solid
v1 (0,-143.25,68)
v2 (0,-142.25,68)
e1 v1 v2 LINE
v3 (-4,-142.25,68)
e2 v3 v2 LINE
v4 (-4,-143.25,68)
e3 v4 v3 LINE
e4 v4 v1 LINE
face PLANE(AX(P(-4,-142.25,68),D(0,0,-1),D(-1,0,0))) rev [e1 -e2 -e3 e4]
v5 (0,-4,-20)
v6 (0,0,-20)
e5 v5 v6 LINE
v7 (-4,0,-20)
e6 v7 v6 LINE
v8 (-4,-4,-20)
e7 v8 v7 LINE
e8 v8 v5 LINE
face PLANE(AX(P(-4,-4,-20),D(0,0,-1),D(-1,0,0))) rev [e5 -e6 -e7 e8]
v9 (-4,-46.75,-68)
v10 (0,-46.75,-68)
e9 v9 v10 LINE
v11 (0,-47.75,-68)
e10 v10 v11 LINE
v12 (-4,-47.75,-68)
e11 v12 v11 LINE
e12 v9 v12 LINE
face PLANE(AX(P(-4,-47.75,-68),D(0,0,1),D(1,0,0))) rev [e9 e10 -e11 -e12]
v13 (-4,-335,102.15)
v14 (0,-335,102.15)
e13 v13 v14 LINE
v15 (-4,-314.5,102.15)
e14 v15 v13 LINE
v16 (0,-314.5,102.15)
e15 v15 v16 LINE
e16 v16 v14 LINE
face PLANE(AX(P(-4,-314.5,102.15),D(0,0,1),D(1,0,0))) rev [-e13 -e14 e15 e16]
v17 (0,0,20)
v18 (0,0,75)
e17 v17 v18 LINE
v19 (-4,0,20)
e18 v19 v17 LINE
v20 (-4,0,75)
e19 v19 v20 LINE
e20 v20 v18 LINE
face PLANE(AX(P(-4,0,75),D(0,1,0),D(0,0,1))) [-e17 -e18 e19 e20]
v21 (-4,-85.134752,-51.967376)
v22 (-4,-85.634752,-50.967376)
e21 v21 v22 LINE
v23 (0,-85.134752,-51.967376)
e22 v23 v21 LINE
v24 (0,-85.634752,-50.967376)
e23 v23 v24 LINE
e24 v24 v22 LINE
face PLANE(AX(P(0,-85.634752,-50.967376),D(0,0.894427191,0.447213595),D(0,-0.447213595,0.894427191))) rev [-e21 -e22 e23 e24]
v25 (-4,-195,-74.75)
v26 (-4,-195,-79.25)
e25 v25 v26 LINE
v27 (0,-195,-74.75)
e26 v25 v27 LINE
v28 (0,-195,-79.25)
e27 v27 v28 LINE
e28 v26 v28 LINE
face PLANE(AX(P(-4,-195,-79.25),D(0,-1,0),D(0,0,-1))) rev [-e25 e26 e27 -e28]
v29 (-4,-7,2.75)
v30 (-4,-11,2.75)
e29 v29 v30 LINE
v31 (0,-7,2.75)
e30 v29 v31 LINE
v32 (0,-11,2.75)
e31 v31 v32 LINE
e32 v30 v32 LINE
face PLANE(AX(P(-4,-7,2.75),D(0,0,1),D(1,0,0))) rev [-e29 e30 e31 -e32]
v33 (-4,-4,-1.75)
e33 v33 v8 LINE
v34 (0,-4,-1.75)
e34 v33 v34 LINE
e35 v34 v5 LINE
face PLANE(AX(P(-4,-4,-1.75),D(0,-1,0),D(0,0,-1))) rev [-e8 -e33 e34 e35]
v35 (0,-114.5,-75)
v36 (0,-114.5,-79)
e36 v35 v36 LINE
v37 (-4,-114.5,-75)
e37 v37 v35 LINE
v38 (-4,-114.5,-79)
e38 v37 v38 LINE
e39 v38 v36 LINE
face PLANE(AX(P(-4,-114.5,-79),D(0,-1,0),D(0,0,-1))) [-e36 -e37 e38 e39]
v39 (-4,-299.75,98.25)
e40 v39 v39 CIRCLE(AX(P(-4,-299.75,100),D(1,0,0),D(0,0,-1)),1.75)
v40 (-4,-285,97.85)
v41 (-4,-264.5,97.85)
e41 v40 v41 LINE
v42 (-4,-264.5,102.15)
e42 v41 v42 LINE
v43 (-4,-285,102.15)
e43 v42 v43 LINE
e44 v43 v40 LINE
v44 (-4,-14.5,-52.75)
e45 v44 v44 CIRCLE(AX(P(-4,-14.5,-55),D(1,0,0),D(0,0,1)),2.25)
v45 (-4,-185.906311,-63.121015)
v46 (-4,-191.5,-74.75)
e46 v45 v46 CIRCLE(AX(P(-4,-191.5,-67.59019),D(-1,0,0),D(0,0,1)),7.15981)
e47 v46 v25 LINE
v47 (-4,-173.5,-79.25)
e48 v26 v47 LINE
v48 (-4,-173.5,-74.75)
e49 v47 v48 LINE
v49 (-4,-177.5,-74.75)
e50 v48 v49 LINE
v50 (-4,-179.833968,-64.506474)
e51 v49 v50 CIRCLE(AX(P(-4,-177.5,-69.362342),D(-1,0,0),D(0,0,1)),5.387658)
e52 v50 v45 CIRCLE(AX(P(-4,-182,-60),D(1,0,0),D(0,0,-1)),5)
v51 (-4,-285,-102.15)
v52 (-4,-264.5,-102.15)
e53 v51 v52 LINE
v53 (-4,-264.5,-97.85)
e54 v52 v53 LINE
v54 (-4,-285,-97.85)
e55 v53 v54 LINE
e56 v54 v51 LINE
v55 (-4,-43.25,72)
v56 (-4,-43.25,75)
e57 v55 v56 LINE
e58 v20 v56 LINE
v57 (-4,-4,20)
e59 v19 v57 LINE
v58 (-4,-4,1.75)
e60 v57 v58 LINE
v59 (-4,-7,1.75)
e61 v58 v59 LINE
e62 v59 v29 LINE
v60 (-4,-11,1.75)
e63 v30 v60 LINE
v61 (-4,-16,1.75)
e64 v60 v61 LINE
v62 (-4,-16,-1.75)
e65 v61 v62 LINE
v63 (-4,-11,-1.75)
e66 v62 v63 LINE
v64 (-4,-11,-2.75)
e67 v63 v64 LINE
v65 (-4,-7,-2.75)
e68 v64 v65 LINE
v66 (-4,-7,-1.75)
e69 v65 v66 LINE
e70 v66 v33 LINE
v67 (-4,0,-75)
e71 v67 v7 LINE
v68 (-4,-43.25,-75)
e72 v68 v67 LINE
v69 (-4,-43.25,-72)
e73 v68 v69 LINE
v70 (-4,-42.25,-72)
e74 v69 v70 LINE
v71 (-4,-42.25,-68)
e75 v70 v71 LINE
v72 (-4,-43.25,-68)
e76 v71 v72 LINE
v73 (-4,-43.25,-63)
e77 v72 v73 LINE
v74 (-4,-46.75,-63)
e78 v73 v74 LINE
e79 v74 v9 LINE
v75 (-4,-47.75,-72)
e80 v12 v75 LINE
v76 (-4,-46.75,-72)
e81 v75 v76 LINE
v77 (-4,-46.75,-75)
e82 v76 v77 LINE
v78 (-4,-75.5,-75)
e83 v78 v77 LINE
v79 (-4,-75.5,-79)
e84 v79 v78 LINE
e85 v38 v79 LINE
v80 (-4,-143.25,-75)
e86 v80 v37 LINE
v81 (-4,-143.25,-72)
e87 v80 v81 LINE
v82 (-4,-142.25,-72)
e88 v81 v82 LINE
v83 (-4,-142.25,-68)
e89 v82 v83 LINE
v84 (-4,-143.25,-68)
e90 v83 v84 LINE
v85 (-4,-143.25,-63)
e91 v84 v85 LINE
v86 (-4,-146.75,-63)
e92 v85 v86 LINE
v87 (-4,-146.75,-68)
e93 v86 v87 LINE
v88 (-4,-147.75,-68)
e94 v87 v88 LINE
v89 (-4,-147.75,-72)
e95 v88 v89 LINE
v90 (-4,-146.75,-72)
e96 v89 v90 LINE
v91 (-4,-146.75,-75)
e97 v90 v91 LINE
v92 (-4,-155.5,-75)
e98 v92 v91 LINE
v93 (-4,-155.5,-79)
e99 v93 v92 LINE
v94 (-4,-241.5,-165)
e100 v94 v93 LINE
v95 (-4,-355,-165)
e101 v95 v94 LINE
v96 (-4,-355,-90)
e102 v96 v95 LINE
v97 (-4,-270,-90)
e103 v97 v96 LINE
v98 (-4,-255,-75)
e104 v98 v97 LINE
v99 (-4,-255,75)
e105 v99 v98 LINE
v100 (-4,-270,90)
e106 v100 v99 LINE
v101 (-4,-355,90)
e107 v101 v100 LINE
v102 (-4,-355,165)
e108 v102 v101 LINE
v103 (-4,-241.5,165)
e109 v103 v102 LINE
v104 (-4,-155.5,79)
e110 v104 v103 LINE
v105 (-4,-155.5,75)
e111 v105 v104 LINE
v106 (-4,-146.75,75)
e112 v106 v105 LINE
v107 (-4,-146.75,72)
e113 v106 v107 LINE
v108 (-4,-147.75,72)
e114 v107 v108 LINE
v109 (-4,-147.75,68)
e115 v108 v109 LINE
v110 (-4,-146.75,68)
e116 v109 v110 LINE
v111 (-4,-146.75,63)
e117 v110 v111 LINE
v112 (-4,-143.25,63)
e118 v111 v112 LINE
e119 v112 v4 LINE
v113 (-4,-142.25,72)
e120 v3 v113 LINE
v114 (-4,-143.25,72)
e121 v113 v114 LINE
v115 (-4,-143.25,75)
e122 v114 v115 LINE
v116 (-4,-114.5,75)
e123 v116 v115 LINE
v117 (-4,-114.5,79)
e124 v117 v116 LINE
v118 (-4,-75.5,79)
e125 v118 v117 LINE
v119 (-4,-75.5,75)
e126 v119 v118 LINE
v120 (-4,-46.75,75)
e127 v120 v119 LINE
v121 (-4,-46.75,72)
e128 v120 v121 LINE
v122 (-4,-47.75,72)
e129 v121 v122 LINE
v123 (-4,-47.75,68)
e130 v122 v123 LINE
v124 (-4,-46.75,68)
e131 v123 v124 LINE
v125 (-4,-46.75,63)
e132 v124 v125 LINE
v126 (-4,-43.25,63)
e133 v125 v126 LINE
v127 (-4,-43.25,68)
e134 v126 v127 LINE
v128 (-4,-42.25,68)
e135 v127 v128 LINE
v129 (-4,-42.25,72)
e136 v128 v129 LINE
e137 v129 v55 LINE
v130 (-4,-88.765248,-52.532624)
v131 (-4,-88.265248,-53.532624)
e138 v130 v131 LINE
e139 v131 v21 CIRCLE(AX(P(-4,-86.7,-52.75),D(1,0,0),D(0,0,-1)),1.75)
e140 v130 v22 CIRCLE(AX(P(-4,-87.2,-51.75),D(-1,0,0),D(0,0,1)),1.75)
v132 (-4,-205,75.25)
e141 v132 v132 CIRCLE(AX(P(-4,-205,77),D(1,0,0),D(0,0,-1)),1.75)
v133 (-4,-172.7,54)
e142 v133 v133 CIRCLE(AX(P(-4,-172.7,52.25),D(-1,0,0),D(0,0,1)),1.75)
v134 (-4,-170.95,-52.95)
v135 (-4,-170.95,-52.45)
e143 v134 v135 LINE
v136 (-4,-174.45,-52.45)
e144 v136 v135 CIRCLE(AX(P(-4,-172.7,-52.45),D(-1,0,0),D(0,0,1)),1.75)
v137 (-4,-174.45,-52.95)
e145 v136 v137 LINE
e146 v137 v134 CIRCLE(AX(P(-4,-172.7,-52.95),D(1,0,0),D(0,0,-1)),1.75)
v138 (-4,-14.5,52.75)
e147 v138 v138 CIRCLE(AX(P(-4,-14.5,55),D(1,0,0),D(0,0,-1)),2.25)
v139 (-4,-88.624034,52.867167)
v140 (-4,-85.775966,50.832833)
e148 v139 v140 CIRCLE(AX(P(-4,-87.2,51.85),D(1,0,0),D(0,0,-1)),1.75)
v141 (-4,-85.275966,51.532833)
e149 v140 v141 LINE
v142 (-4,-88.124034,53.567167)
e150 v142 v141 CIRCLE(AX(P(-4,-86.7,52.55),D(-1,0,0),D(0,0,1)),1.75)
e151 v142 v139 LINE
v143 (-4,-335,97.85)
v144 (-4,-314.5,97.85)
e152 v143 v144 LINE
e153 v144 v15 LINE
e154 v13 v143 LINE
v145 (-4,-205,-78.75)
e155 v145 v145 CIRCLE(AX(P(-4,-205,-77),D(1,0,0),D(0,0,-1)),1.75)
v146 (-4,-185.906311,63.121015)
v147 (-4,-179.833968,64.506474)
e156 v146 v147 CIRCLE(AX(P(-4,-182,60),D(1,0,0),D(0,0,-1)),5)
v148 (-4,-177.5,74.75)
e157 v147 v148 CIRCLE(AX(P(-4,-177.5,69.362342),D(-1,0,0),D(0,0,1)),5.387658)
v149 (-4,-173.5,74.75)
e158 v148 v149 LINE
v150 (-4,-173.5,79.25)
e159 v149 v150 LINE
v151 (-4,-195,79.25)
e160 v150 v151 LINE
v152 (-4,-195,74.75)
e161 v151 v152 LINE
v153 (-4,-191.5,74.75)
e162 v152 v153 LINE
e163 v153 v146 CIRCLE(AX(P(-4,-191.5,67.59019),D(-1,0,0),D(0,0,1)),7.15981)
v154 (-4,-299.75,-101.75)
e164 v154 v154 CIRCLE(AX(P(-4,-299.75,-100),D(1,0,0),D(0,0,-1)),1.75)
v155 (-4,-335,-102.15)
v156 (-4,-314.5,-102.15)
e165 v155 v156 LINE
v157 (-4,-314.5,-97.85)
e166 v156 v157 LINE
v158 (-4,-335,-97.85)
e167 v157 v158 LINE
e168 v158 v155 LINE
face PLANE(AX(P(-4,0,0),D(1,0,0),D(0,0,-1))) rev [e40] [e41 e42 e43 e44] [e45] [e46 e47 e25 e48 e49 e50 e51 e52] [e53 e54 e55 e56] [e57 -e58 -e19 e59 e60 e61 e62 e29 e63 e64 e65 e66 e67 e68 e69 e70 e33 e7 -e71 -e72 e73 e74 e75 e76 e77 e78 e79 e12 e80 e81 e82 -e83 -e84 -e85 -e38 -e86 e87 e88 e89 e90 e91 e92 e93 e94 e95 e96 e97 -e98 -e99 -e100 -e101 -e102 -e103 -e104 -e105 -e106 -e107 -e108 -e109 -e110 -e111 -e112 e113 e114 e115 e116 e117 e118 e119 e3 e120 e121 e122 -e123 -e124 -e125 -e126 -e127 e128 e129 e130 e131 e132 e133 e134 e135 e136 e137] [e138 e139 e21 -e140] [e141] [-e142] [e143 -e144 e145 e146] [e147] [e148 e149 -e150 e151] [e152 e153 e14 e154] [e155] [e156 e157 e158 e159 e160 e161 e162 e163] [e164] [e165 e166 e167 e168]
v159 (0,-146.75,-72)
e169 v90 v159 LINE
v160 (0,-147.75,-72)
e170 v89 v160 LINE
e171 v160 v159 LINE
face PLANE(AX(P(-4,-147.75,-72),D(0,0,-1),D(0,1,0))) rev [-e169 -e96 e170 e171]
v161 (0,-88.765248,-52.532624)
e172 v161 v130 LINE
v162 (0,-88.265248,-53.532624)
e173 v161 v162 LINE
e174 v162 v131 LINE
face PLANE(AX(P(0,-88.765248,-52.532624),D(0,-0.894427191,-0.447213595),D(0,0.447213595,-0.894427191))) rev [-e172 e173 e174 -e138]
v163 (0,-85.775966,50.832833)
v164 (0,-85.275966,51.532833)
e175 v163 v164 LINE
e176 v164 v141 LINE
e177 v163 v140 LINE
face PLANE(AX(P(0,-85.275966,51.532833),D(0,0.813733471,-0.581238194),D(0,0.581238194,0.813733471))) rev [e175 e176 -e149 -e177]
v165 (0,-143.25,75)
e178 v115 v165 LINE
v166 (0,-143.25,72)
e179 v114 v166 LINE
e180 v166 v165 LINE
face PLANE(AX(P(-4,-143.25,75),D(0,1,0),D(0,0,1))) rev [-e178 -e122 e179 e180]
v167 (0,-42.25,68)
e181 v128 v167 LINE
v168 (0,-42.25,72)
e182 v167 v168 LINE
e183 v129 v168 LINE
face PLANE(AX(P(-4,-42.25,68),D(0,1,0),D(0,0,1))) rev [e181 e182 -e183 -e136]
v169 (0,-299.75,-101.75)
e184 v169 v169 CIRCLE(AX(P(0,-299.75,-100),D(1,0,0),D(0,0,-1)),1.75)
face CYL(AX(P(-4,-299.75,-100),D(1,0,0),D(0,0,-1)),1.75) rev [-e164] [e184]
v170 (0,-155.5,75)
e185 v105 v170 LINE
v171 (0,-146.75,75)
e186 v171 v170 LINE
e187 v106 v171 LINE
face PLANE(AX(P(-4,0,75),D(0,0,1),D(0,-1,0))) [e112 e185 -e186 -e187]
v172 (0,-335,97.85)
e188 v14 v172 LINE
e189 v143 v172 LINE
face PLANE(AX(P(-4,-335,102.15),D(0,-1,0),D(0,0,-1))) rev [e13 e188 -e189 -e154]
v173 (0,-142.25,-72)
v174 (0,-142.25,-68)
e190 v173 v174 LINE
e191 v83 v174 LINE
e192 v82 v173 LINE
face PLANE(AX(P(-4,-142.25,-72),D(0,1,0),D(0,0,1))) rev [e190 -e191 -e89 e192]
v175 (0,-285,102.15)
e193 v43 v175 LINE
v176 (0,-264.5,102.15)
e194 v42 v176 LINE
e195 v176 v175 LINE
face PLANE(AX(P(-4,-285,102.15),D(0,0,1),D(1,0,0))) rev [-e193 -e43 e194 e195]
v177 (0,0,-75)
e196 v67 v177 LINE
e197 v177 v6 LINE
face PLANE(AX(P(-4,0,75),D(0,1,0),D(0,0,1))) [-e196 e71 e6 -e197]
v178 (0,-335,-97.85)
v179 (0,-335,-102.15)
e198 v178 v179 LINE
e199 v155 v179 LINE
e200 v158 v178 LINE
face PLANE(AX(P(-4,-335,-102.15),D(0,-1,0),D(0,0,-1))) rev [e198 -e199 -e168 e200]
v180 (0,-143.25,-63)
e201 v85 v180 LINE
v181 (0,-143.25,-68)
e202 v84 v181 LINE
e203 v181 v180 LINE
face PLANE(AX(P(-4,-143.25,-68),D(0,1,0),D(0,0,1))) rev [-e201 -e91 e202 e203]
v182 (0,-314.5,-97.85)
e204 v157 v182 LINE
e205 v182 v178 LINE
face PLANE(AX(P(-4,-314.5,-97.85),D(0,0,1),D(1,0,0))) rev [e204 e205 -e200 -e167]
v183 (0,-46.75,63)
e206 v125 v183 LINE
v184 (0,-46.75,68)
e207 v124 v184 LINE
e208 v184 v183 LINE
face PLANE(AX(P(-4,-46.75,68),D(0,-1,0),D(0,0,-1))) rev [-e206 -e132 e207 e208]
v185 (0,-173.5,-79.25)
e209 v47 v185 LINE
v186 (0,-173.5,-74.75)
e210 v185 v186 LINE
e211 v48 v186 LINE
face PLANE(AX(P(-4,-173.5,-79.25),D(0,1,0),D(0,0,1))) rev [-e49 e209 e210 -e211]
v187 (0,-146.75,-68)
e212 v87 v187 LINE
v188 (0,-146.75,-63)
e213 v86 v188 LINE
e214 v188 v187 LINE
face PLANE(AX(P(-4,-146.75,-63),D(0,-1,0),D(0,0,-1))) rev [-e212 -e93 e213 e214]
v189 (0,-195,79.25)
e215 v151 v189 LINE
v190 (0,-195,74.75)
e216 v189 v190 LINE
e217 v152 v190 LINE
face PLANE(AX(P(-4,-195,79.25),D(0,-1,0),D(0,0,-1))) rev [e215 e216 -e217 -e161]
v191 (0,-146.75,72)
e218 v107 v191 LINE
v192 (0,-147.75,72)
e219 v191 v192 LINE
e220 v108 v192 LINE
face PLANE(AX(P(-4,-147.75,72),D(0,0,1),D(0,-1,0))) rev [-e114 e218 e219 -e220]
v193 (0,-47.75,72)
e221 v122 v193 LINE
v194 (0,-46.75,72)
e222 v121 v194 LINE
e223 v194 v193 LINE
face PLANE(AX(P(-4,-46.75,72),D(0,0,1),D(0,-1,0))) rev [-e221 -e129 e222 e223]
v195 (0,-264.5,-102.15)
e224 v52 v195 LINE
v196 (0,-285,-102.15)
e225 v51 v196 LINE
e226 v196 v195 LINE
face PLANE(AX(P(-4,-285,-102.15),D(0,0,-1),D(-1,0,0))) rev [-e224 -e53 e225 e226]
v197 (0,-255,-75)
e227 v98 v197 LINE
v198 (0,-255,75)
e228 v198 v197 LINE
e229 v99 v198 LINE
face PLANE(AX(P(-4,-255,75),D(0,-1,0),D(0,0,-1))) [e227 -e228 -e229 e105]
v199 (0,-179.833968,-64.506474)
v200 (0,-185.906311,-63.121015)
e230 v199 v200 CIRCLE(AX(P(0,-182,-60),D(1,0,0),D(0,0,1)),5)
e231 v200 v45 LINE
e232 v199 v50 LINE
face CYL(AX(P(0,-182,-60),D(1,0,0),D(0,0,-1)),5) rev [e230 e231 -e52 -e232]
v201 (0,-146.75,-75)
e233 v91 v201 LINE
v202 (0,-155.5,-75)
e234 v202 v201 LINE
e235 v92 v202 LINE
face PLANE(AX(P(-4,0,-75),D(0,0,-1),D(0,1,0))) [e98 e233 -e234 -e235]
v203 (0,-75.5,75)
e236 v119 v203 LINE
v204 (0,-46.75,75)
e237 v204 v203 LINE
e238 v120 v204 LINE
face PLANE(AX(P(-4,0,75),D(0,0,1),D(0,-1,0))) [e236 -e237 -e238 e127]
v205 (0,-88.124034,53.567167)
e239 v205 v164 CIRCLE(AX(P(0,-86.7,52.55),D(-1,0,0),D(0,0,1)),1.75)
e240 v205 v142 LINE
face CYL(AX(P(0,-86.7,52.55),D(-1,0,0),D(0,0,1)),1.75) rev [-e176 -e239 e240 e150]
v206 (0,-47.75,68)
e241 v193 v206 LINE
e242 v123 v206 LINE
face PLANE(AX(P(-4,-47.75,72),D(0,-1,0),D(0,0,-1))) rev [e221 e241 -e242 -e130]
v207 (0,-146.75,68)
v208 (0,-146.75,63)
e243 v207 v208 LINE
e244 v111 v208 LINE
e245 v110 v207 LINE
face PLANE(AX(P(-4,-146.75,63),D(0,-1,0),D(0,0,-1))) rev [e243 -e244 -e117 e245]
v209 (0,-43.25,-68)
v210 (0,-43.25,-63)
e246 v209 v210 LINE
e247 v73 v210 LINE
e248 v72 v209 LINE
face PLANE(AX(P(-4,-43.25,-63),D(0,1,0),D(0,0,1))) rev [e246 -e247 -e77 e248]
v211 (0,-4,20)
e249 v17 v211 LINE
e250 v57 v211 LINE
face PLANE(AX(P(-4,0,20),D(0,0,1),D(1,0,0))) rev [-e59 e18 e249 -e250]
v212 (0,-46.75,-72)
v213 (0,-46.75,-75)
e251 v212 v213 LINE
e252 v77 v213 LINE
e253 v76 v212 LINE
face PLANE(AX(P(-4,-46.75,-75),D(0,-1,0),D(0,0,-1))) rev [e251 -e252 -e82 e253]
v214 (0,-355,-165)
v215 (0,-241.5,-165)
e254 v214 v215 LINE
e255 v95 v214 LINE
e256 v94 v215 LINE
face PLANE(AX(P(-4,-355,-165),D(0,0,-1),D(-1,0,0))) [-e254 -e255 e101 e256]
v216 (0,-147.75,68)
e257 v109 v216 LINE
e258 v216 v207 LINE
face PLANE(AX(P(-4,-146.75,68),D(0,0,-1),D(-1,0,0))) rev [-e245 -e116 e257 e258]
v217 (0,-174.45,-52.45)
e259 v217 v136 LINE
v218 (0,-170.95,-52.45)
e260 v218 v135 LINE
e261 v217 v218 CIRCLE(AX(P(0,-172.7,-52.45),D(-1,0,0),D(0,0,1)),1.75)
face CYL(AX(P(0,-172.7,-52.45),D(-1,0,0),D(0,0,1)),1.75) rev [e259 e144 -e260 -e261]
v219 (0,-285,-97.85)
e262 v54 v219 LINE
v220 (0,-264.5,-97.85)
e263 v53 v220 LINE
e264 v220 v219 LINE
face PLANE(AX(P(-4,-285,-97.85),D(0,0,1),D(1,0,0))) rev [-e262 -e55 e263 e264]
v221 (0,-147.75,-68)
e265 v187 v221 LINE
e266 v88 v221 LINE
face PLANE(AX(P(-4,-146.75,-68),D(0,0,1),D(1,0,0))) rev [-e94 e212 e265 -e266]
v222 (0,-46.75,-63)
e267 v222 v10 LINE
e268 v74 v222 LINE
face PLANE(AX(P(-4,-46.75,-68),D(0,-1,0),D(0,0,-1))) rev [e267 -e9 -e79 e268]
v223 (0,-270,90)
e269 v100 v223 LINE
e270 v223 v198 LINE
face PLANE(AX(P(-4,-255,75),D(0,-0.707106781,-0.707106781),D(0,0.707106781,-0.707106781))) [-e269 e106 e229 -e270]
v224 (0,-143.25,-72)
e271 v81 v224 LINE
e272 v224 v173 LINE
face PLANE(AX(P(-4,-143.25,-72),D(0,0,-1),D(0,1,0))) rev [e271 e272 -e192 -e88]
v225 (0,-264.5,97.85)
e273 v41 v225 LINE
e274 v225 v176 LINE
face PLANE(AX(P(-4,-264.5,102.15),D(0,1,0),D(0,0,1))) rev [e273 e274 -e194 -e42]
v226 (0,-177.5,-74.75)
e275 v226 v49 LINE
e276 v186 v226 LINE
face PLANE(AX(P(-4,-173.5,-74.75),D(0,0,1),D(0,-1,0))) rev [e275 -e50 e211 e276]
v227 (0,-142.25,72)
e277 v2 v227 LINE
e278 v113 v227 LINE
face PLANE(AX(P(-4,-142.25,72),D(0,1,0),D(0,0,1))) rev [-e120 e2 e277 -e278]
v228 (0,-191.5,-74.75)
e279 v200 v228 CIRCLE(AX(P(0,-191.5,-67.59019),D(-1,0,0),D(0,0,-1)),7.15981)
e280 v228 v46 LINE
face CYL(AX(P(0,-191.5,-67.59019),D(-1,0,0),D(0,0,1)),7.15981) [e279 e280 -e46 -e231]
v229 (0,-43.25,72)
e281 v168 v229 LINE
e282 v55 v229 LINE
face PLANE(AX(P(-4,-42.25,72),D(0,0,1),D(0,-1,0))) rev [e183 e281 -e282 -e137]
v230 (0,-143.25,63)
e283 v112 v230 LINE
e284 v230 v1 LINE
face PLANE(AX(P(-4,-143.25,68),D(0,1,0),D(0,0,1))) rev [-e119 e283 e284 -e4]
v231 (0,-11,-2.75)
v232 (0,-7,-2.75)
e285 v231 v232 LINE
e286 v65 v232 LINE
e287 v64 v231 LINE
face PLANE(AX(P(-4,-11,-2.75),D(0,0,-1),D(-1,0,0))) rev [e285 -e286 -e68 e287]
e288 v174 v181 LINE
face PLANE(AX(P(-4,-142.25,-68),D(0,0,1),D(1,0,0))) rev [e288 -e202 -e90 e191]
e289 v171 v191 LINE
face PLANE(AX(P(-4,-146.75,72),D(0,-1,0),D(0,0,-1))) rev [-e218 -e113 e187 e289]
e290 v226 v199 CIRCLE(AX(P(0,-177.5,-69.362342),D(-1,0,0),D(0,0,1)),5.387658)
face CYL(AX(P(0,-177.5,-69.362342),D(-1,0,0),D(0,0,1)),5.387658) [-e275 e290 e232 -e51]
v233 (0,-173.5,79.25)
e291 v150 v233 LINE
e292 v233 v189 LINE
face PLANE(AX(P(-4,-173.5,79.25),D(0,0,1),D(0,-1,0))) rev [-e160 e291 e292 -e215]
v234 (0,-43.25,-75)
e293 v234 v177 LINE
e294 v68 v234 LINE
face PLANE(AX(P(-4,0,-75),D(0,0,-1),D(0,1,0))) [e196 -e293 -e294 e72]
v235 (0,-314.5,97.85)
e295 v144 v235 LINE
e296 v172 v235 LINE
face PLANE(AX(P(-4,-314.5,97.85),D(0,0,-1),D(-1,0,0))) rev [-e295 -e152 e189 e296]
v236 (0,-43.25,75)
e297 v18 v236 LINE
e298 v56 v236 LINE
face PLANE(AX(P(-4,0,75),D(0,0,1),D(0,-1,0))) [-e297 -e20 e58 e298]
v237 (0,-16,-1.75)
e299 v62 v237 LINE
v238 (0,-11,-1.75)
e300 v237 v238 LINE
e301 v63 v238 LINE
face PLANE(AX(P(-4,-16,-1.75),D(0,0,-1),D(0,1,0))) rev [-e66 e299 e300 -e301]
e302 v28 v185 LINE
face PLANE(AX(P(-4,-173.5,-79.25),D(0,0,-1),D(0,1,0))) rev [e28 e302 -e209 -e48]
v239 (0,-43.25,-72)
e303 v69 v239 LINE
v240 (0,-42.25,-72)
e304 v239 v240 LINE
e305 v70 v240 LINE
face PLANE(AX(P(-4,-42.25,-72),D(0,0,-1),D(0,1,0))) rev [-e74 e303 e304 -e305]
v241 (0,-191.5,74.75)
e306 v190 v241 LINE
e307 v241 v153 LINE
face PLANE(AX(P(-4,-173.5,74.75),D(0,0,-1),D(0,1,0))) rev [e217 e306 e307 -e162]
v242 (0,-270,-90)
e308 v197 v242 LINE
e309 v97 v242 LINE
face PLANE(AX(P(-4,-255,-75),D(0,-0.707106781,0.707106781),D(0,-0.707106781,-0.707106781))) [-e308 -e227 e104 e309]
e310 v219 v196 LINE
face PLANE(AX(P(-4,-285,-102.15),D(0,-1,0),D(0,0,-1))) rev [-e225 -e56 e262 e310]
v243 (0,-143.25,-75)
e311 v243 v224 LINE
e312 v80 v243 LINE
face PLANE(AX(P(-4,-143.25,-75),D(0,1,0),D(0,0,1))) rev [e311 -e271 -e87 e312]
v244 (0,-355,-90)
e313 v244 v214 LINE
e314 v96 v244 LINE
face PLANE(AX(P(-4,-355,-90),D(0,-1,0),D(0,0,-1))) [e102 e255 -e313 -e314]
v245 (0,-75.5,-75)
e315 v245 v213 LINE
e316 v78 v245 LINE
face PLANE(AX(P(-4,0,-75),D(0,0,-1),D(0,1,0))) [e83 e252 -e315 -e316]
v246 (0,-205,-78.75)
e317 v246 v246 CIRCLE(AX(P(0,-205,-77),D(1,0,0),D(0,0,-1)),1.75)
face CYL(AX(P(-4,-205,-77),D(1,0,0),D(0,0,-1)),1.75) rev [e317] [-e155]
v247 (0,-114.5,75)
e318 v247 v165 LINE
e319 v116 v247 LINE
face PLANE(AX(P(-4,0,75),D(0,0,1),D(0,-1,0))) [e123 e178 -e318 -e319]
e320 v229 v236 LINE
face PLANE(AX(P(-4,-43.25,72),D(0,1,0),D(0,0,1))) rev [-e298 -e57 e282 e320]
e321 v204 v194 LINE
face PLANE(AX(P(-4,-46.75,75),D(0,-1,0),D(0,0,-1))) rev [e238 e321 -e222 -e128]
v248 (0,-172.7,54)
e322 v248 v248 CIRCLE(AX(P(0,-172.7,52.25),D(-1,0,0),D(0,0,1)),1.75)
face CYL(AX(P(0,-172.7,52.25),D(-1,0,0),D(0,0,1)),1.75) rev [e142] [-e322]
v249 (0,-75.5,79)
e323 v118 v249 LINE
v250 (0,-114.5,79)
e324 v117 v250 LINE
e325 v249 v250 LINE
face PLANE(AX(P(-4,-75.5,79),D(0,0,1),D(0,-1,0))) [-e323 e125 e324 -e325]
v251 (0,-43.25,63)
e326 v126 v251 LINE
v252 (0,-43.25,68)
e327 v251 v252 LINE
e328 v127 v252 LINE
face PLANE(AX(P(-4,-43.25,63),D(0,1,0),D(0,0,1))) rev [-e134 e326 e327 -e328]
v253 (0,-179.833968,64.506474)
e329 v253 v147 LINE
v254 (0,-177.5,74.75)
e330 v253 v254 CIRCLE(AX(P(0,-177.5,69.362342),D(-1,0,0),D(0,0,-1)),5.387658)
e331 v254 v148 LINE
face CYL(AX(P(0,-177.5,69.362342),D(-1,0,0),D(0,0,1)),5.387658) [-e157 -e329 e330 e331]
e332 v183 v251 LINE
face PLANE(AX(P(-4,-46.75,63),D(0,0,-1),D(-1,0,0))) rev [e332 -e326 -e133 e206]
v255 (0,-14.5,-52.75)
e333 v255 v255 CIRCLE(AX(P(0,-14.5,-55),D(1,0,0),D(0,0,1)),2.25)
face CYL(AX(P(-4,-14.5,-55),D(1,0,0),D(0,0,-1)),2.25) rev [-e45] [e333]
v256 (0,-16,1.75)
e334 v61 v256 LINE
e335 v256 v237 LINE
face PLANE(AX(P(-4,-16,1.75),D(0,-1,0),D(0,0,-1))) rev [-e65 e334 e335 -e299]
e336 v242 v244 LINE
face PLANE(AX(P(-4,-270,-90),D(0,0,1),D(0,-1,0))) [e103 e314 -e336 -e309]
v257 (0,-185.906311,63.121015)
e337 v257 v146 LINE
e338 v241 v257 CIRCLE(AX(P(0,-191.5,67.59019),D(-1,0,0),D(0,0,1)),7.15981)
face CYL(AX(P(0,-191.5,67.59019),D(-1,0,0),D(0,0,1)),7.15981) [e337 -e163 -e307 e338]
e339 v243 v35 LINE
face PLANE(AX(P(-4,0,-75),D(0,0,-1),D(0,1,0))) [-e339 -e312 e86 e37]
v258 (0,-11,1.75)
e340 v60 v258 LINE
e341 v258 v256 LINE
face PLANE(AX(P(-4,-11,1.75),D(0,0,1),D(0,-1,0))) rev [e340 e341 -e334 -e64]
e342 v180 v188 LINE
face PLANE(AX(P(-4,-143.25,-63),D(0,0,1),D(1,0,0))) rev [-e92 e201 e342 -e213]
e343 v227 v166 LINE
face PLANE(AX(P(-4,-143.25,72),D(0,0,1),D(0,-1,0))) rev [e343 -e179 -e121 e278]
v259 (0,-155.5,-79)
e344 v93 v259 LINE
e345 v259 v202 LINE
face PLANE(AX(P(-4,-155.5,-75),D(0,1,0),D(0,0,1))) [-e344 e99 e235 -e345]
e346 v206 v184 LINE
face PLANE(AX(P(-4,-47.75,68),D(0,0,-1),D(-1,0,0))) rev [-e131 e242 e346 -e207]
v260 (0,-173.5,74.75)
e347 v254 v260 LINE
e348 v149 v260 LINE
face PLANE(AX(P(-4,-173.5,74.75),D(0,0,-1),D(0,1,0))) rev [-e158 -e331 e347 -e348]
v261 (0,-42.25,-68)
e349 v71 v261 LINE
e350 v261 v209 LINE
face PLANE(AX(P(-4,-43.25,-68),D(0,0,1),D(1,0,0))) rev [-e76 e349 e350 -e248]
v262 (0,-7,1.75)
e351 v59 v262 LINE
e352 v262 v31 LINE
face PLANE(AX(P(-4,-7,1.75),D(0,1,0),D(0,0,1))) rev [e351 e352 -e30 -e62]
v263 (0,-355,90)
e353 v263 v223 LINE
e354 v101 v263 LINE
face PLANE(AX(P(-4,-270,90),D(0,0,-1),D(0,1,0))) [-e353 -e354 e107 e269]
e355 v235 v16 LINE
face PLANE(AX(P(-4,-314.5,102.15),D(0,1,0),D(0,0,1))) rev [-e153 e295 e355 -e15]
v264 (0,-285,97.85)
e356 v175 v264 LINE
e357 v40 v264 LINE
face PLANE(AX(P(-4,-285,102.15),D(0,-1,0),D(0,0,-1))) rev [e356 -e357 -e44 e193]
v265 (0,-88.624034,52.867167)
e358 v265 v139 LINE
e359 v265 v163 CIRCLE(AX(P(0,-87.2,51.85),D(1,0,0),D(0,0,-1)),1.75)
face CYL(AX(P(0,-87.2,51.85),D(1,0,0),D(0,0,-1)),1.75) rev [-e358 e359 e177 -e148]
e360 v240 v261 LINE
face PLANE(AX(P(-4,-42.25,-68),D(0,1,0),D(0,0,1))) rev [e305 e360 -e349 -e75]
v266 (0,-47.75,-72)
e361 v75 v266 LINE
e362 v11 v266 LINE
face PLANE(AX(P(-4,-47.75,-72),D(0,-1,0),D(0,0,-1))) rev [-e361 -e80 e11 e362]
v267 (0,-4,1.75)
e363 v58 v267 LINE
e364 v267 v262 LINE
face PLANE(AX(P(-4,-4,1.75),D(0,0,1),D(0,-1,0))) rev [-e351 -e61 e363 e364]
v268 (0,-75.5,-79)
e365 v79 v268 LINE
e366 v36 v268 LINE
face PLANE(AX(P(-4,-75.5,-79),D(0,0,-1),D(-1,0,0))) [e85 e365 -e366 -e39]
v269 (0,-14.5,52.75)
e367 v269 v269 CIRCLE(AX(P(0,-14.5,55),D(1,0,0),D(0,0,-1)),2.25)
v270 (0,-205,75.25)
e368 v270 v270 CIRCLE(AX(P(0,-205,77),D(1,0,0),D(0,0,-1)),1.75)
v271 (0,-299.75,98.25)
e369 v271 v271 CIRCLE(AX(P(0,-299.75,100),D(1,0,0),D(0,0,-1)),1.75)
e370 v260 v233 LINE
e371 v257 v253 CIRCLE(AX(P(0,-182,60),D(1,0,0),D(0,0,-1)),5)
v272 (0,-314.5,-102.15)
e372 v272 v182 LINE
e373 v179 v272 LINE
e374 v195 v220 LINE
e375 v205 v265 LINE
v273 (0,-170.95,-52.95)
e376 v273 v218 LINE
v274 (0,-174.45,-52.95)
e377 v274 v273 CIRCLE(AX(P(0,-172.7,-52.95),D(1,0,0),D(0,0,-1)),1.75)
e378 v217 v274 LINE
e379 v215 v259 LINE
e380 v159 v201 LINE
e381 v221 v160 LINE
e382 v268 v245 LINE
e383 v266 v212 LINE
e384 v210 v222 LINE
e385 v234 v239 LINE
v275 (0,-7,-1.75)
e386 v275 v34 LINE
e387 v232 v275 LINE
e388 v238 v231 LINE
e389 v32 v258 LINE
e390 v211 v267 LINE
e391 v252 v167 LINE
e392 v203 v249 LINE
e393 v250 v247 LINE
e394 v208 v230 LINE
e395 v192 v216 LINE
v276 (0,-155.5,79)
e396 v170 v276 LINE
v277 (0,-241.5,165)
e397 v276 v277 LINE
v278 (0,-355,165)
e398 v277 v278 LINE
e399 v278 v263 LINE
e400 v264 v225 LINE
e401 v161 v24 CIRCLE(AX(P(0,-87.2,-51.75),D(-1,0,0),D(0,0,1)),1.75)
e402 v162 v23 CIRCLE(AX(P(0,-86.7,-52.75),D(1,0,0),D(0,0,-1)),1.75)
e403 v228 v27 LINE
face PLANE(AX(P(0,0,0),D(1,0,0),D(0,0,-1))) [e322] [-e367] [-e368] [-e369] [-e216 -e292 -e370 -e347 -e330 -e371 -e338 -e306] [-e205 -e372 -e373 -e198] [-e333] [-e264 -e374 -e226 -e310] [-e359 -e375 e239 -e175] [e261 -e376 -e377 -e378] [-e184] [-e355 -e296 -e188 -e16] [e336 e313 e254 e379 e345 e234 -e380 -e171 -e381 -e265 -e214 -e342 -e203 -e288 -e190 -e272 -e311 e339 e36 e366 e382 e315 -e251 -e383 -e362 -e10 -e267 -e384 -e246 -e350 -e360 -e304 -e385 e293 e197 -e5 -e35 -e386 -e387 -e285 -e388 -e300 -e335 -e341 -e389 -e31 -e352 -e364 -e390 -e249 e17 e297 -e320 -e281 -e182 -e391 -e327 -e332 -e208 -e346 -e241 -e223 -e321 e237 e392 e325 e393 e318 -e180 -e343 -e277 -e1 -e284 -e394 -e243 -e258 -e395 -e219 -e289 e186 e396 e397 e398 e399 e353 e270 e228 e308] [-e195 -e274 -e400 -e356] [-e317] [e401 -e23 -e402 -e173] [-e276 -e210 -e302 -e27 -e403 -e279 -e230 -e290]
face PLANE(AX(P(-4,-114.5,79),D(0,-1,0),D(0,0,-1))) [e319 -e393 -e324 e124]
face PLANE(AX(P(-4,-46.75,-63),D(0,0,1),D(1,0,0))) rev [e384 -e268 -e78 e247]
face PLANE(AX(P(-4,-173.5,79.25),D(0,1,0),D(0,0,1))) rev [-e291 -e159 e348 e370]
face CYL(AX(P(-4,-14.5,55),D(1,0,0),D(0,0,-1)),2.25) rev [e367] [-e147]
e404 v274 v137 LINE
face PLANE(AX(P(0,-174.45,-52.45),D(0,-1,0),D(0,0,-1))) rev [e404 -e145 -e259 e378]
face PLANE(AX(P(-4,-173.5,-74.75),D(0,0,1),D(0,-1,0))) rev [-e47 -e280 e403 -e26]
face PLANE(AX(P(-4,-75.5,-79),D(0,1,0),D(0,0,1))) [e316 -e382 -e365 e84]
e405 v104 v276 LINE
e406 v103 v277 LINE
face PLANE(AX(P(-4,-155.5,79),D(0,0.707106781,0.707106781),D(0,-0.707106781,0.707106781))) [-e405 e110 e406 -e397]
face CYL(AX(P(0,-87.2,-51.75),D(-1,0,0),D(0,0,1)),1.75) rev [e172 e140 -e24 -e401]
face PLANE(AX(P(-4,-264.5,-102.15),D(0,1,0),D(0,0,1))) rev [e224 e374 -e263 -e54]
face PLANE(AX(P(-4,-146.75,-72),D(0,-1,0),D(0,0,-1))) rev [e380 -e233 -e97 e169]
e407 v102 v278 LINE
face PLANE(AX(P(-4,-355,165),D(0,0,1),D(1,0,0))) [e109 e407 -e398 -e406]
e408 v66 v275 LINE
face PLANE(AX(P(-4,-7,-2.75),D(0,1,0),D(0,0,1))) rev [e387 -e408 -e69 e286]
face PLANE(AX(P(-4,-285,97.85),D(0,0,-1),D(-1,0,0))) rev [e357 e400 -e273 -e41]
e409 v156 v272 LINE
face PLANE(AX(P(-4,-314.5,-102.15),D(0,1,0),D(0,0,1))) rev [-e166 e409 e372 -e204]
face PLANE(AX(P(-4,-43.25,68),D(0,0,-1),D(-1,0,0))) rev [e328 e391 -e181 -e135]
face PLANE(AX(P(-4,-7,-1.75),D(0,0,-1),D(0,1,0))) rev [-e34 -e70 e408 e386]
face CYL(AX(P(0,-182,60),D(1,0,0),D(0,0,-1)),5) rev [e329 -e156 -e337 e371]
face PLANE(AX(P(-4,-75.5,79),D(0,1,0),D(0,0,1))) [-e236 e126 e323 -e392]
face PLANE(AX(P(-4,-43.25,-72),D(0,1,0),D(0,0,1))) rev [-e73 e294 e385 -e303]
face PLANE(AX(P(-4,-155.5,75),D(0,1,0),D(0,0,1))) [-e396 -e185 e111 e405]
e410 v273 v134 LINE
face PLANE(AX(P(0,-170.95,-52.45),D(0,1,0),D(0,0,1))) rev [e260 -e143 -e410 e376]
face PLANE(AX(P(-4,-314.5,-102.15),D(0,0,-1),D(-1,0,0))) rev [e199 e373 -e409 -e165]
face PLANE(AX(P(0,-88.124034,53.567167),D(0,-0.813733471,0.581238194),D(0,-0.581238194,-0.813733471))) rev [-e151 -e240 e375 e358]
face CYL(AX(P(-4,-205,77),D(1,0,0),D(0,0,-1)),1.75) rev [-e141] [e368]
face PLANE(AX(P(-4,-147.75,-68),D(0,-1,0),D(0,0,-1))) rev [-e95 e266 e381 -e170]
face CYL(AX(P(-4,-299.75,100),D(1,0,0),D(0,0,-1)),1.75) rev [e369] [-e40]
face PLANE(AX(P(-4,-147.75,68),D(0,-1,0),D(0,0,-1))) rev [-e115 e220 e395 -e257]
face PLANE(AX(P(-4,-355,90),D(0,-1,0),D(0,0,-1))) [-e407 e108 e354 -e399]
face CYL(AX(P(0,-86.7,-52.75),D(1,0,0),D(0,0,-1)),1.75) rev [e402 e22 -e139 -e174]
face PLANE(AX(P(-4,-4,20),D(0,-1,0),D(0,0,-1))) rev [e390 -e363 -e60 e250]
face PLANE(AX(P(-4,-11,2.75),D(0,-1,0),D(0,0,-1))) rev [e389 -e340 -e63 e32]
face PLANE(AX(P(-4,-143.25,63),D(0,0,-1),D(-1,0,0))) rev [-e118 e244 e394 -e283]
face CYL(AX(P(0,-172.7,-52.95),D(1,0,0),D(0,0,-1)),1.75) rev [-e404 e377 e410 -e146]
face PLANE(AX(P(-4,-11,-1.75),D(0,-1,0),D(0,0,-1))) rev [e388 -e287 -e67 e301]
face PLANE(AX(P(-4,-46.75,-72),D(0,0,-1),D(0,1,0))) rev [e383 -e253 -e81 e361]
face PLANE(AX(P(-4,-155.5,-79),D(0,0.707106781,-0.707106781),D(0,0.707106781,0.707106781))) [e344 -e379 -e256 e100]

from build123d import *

# Parameters (mm, degrees)
SKETCH1_W           = 150
SKETCH1_H           = 255
BASE_FLANGE1_DEPTH  = 4
CUT_EXTRUDE1_DEPTH  = 266.830773237
SKETCH5_W           = 4
SKETCH5_H           = 39
TAB1_DEPTH          = 4
SKETCH6_R           = 2.25
CUT_EXTRUDE2_DEPTH  = 267.986891064
TAB2_DEPTH          = 4
SKETCH8_R           = 1.75
CUT_EXTRUDE3_DEPTH  = 392.492017799
SKETCH10_R          = 1.75
SKETCH10_W          = 4.3
SKETCH10_H          = 20.5
CUT_EXTRUDE5_DEPTH  = 392.492017799
CUT_EXTRUDE6_DEPTH  = 392.492017799
SKETCH12_W          = 4.5
SKETCH12_H          = 21.5
CUT_EXTRUDE7_DEPTH  = 392.492017799
SKETCH14_R          = 1.75
CUT_EXTRUDE9_DEPTH  = 392.492017799
CUT_EXTRUDE11_DEPTH = 392.492017799
CUT_EXTRUDE12_DEPTH = 392.492017799


# Sheet-metal steps are written as plain solids
with BuildPart() as part:
    # Sketch1 → Base-Flange1 (new body)
    with BuildSketch(Plane(origin=(0, 0, 0), x_dir=(0, 0, -1), z_dir=(1, 0, 0))):
        with Locations((0, -127.5)):
            Rectangle(SKETCH1_W, SKETCH1_H)
    extrude(amount=-BASE_FLANGE1_DEPTH)

    # Sketch4 → Cut-Extrude1 (cut, through all)
    with BuildSketch(Plane(origin=(0, 0, 0), x_dir=(0, 0, -1), z_dir=(1, 0, 0))):
        Polygon((-75, -43.25), (-75, -46.75), (-72, -46.75), (-72, -47.75), (-68, -47.75), (-68, -46.75), (-63, -46.75), (-63, -43.25), (-68, -43.25), (-68, -42.25), (-72, -42.25), (-72, -43.25), align=None)
        Polygon((-72, -146.75), (-75, -146.75), (-75, -143.25), (-72, -143.25), (-72, -142.25), (-68, -142.25), (-68, -143.25), (-63, -143.25), (-63, -146.75), (-68, -146.75), (-68, -147.75), (-72, -147.75), align=None)
        Polygon((75, -146.75), (75, -143.25), (72, -143.25), (72, -142.25), (68, -142.25), (68, -143.25), (63, -143.25), (63, -146.75), (68, -146.75), (68, -147.75), (72, -147.75), (72, -146.75), align=None)
        Polygon((72, -43.25), (75, -43.25), (75, -46.75), (72, -46.75), (72, -47.75), (68, -47.75), (68, -46.75), (63, -46.75), (63, -43.25), (68, -43.25), (68, -42.25), (72, -42.25), align=None)
    extrude(amount=-CUT_EXTRUDE1_DEPTH, mode=Mode.SUBTRACT)

    # Sketch5 → Tab1 (add)
    with BuildSketch(Plane(origin=(0, 0, 0), x_dir=(0, 0, -1), z_dir=(1, 0, 0))):
        with Locations((-77, -95)):
            Rectangle(SKETCH5_W, SKETCH5_H)
        with Locations((77, -95)):
            Rectangle(SKETCH5_W, SKETCH5_H)
    extrude(amount=-TAB1_DEPTH)

    # Sketch6 → Cut-Extrude2 (cut, through all)
    with BuildSketch(Plane(origin=(0, 0, 0), x_dir=(0, 0, -1), z_dir=(1, 0, 0))):
        with Locations((-55, -14.5)):
            Circle(SKETCH6_R)
        with Locations(Location((55, -14.5, 0), (0, 0, 180))):
            Circle(SKETCH6_R)
    extrude(amount=-CUT_EXTRUDE2_DEPTH, mode=Mode.SUBTRACT)

    # Sketch7 → Tab2 (add)
    with BuildSketch(Plane(origin=(0, 0, 0), x_dir=(0, 0, -1), z_dir=(1, 0, 0))):
        Polygon((-75, -255), (-90, -270), (-90, -355), (-165, -355), (-165, -241.5), (-79, -155.5), (-75, -155.5), align=None)
        Polygon((75, -155.5), (75, -255), (90, -270), (90, -355), (165, -355), (165, -241.5), (79, -155.5), align=None)
    extrude(amount=-TAB2_DEPTH)

    # Sketch8 → Cut-Extrude3 (cut, through all)
    with BuildSketch(Plane(origin=(0, 0, 0), x_dir=(0, 0, -1), z_dir=(1, 0, 0))):
        with Locations((-77, -205)):
            Circle(SKETCH8_R)
        with Locations((77, -205)):
            Circle(SKETCH8_R)
    extrude(amount=-CUT_EXTRUDE3_DEPTH, mode=Mode.SUBTRACT)

    # Sketch10 → Cut-Extrude5 (cut, through all)
    with BuildSketch(Plane(origin=(0, 0, 0), x_dir=(0, 0, -1), z_dir=(1, 0, 0))):
        with Locations((-100, -299.75)):
            Circle(SKETCH10_R)
        with Locations((100, -299.75)):
            Circle(SKETCH10_R)
        with Locations((-100, -324.75)):
            Rectangle(SKETCH10_W, SKETCH10_H)
        with Locations((-100, -274.75)):
            Rectangle(SKETCH10_W, SKETCH10_H)
        with Locations((100, -274.75)):
            Rectangle(SKETCH10_W, SKETCH10_H)
        with Locations((100, -324.75)):
            Rectangle(SKETCH10_W, SKETCH10_H)
    extrude(amount=-CUT_EXTRUDE5_DEPTH, mode=Mode.SUBTRACT)

    # Sketch11 → Cut-Extrude6 (cut, through all)
    with BuildSketch(Plane(origin=(0, 0, 0), x_dir=(0, 0, -1), z_dir=(1, 0, 0))):
        Polygon((-20, 0), (-20, -4), (-1.75, -4), (-1.75, -7), (-2.75, -7), (-2.75, -11), (-1.75, -11), (-1.75, -16), (1.75, -16), (1.75, -11), (2.75, -11), (2.75, -7), (1.75, -7), (1.75, -4), (20, -4), (20, 0), align=None)
    extrude(amount=-CUT_EXTRUDE6_DEPTH, mode=Mode.SUBTRACT)

    # Sketch12 → Cut-Extrude7 (cut, through all)
    with BuildSketch(Plane(origin=(0, 0, 0), x_dir=(0, 0, -1), z_dir=(1, 0, 0))):
        with Locations((-77, -184.25)):
            Rectangle(SKETCH12_W, SKETCH12_H)
        with Locations((77, -184.25)):
            Rectangle(SKETCH12_W, SKETCH12_H)
    extrude(amount=-CUT_EXTRUDE7_DEPTH, mode=Mode.SUBTRACT)

    # Sketch14 → Cut-Extrude9 (cut, through all)
    with BuildSketch(Plane(origin=(-4, 0, 0), x_dir=(0, 1, 0), z_dir=(-1, 0, 0))):
        with Locations(Location((-172.7, 52.45, 0), (0, 0, 270))):
            Circle(SKETCH14_R)
        with Locations(Location((-172.7, -52.25, 0), (0, 0, 270))):
            Circle(SKETCH14_R)
        with Locations(Location((-86.7, -52.55, 0), (0, 0, 270))):
            Circle(SKETCH14_R)
        with Locations(Location((-87.2, 51.75, 0), (0, 0, 270))):
            Circle(SKETCH14_R)
    extrude(amount=-CUT_EXTRUDE9_DEPTH, mode=Mode.SUBTRACT)

    # Sketch16 → Cut-Extrude11 (cut, through all)
    with BuildSketch(Plane(origin=(0, 0, 0), x_dir=(0, 0, -1), z_dir=(1, 0, 0))):
        with BuildLine():
            Line((-74.75, -177.5), (-74.75, -191.5))
            ThreePointArc((-74.75, -191.5), (-70.693771456, -185.047817237), (-63.121014964, -185.906310995))
            ThreePointArc((-63.121014964, -185.906310995), (-55.125270956, -180.887787453), (-64.506473724, -179.833968012))
            ThreePointArc((-64.506473724, -179.833968012), (-70.559234361, -182.753028585), (-74.75, -177.5))
        make_face()
        with BuildLine():
            Line((74.75, -177.5), (74.75, -191.5))
            ThreePointArc((74.75, -191.5), (70.693771456, -185.047817237), (63.121014964, -185.906310995))
            ThreePointArc((63.121014964, -185.906310995), (55.125270956, -180.887787453), (64.506473724, -179.833968012))
            ThreePointArc((64.506473724, -179.833968012), (70.559234361, -182.753028585), (74.75, -177.5))
        make_face()
    extrude(amount=-CUT_EXTRUDE11_DEPTH, mode=Mode.SUBTRACT)

    # Sketch17 → Cut-Extrude12 (cut, through all)
    with BuildSketch(Plane(origin=(0, 0, 0), x_dir=(0, 0, -1), z_dir=(1, 0, 0))):
        with BuildLine():
            Line((52.45, -170.95), (52.95, -170.95))
            ThreePointArc((52.95, -170.95), (54.7, -172.7), (52.95, -174.45))
            Line((52.95, -174.45), (52.45, -174.45))
            ThreePointArc((52.45, -174.45), (50.7, -172.7), (52.45, -170.95))
        make_face()
        with BuildLine():
            Line((-51.532833161, -85.275966425), (-50.832833161, -85.775966425))
            ThreePointArc((-50.832833161, -85.775966425), (-50.425966425, -88.217166839), (-52.867166839, -88.624033575))
            Line((-52.867166839, -88.624033575), (-53.567166839, -88.124033575))
            ThreePointArc((-53.567166839, -88.124033575), (-53.974033575, -85.682833161), (-51.532833161, -85.275966425))
        make_face()
        with BuildLine():
            Line((50.967376208, -85.634752416), (51.967376208, -85.134752416))
            ThreePointArc((51.967376208, -85.134752416), (54.315247584, -85.917376208), (53.532623792, -88.265247584))
            Line((53.532623792, -88.265247584), (52.532623792, -88.765247584))
            ThreePointArc((52.532623792, -88.765247584), (50.184752416, -87.982623792), (50.967376208, -85.634752416))
        make_face()
    extrude(amount=-CUT_EXTRUDE12_DEPTH, mode=Mode.SUBTRACT)


solid = part.part
